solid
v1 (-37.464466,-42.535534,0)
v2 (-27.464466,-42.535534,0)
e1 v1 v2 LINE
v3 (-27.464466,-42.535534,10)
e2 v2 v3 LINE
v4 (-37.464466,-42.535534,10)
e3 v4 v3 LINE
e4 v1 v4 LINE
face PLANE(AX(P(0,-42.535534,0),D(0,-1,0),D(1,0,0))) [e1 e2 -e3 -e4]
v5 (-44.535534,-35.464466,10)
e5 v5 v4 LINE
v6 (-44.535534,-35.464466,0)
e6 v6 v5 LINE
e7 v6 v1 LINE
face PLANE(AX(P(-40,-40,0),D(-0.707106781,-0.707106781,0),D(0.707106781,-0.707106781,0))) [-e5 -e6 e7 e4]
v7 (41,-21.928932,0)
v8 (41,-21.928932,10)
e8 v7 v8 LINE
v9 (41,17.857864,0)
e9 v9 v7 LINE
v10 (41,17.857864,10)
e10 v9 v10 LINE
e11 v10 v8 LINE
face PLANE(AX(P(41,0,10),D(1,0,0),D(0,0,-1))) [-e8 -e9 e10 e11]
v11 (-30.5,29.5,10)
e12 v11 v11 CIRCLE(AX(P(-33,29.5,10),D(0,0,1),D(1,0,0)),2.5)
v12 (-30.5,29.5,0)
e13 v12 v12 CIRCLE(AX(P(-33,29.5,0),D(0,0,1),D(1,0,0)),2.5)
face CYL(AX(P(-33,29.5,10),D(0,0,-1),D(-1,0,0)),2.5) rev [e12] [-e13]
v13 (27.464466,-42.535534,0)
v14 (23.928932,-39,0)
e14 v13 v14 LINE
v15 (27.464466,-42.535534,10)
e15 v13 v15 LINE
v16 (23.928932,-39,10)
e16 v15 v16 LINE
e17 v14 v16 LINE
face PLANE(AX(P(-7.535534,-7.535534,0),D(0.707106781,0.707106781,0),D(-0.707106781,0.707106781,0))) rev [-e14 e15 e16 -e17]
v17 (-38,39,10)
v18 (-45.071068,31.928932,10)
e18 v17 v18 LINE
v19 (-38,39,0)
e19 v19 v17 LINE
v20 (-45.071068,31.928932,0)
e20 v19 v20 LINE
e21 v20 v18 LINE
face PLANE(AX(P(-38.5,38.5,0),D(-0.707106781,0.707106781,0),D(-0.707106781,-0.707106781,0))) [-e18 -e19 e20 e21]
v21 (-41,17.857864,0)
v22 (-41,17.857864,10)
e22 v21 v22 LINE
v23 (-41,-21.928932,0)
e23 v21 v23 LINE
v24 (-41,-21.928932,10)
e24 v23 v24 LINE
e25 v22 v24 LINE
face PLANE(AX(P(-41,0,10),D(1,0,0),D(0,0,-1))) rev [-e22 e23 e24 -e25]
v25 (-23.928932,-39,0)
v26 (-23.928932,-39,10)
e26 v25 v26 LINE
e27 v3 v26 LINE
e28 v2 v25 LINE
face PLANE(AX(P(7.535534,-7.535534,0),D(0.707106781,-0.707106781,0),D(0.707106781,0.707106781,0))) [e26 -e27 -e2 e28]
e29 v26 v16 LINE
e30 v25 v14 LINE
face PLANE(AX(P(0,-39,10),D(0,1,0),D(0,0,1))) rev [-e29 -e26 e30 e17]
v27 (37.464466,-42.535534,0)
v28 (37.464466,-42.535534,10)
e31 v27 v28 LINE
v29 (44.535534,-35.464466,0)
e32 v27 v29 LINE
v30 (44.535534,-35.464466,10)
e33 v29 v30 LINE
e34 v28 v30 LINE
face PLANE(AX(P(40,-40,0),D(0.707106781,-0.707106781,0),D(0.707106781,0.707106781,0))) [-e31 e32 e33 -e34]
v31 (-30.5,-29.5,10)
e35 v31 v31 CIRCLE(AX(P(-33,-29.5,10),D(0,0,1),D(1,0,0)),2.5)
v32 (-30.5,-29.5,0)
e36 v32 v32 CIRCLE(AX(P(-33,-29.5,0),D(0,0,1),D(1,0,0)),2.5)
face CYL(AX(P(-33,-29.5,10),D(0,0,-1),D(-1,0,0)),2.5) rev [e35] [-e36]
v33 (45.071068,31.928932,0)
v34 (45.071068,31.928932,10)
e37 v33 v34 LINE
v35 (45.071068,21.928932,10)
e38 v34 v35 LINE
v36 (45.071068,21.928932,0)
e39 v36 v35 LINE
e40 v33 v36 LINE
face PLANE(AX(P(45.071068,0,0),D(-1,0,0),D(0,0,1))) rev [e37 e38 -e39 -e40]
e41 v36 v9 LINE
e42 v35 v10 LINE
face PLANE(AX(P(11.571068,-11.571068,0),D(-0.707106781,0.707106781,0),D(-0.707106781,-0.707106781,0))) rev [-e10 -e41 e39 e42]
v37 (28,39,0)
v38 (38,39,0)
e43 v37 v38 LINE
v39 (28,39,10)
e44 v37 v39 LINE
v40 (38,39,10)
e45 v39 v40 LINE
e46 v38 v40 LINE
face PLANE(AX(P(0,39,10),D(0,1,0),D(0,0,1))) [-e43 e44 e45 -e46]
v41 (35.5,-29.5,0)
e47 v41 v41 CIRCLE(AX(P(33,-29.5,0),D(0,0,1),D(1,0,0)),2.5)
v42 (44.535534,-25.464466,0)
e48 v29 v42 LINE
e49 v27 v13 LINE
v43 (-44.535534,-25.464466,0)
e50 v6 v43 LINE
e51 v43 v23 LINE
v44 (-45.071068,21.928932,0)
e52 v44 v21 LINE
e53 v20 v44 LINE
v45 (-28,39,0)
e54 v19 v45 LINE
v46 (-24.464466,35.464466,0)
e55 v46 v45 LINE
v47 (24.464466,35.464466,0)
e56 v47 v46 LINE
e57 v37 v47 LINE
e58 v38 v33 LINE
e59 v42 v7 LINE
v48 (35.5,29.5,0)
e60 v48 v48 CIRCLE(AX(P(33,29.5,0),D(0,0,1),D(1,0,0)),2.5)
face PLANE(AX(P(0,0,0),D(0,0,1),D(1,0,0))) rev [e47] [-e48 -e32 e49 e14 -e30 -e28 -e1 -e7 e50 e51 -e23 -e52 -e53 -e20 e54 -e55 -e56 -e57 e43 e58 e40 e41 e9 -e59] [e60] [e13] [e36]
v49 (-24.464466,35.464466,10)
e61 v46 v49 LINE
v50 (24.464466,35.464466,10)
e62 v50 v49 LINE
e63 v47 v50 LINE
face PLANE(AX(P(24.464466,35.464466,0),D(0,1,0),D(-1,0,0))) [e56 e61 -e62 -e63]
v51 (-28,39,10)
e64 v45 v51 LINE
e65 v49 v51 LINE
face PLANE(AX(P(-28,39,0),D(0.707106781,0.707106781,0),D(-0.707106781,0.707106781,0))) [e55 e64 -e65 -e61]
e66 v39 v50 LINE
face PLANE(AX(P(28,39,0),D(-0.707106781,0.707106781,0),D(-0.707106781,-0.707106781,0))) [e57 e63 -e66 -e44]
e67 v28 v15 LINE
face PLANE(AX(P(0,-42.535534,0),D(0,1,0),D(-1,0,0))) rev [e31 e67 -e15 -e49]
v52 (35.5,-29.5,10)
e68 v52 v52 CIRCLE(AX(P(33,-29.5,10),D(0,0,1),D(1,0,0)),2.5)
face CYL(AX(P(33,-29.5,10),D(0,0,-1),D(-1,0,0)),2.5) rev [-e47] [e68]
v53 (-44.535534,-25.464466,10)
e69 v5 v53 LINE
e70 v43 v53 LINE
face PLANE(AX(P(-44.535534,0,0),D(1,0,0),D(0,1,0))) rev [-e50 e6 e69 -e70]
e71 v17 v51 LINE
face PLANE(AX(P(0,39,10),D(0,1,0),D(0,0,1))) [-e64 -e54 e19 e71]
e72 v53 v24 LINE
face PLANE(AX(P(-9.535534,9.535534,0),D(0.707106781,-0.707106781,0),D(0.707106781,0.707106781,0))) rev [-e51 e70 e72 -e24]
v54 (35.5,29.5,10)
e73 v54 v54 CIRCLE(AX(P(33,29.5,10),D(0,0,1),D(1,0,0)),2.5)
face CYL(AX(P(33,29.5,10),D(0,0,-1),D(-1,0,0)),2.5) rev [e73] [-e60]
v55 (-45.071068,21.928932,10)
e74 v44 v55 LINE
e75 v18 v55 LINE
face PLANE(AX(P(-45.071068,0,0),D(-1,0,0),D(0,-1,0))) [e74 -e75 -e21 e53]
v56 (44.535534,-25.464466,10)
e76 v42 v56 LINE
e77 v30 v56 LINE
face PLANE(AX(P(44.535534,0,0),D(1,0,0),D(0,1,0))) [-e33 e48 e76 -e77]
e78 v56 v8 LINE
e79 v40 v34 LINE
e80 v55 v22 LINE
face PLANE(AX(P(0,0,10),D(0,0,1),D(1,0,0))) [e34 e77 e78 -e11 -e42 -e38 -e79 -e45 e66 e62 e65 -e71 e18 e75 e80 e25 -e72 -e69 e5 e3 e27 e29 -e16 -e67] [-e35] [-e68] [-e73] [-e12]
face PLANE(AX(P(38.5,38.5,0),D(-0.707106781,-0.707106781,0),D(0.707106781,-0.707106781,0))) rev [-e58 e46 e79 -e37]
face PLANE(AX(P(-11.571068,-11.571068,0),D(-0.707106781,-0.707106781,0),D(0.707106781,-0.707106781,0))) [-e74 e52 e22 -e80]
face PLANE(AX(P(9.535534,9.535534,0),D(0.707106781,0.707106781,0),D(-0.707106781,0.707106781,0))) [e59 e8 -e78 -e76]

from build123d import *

# Parameters (mm, degrees)
CROQUIS1_W                   = 82
CROQUIS1_H                   = 78
CROQUIS1_R                   = 2.5
SALIENTE_EXTRUIR5_DEPTH      = 10
SALIENTE_EXTRUIR7_DEPTH      = 10
CORTAR_EXTRUIR_L_MINA1_START = -10
CORTAR_EXTRUIR_L_MINA1_DEPTH = 10


# Read off the part's stored shape, not the designer's step: Cortar-Extruir-Lámina1
with BuildPart() as part:
    # Croquis1 → Saliente-Extruir5 (new body)
    with BuildSketch(Plane.XY):
        Rectangle(CROQUIS1_W, CROQUIS1_H)
        with Locations((-33, 29.5)):
            Circle(CROQUIS1_R, mode=Mode.SUBTRACT)
        with Locations((33, 29.5)):
            Circle(CROQUIS1_R, mode=Mode.SUBTRACT)
        with Locations((33, -29.5)):
            Circle(CROQUIS1_R, mode=Mode.SUBTRACT)
        with Locations((-33, -29.5)):
            Circle(CROQUIS1_R, mode=Mode.SUBTRACT)
    extrude(amount=SALIENTE_EXTRUIR5_DEPTH)

    # Croquis6 → Saliente-Extruir7 (add, through all)
    with BuildSketch(Plane.XY.offset(10)):
        Polygon((-41, 17.857864376), (-41, 36), (-45.071067812, 31.928932188), (-45.071067812, 21.928932188), align=None)
        Polygon((45.071067812, 31.928932188), (41, 36), (41, 17.857864376), (45.071067812, 21.928932188), align=None)
        Polygon((-41, -39), (-41, -21.928932188), (-44.535533906, -25.464466094), (-44.535533906, -35.464466094), align=None)
        Polygon((44.535533906, -25.464466094), (41, -21.928932188), (41, -39), (44.535533906, -35.464466094), align=None)
        Polygon((-23.928932188, -39), (-41, -39), (-37.464466094, -42.535533906), (-27.464466094, -42.535533906), align=None)
        Polygon((37.464466094, -42.535533906), (41, -39), (23.928932188, -39), (27.464466094, -42.535533906), align=None)
    extrude(amount=-SALIENTE_EXTRUIR7_DEPTH)

    # Cortar-Extruir-Lámina1 outline → Cortar-Extruir-Lámina1 (cut)
    with BuildSketch(Plane.XY.offset(10).offset(CORTAR_EXTRUIR_L_MINA1_START)):
        Polygon((41, 39), (38, 39), (41, 36), align=None)
        Polygon((28, 39), (-28, 39), (-24.464466094, 35.464466094), (24.464466094, 35.464466094), align=None)
        Polygon((-41, 36), (-38, 39), (-41, 39), align=None)
    extrude(amount=CORTAR_EXTRUIR_L_MINA1_DEPTH, mode=Mode.SUBTRACT)


solid = part.part
